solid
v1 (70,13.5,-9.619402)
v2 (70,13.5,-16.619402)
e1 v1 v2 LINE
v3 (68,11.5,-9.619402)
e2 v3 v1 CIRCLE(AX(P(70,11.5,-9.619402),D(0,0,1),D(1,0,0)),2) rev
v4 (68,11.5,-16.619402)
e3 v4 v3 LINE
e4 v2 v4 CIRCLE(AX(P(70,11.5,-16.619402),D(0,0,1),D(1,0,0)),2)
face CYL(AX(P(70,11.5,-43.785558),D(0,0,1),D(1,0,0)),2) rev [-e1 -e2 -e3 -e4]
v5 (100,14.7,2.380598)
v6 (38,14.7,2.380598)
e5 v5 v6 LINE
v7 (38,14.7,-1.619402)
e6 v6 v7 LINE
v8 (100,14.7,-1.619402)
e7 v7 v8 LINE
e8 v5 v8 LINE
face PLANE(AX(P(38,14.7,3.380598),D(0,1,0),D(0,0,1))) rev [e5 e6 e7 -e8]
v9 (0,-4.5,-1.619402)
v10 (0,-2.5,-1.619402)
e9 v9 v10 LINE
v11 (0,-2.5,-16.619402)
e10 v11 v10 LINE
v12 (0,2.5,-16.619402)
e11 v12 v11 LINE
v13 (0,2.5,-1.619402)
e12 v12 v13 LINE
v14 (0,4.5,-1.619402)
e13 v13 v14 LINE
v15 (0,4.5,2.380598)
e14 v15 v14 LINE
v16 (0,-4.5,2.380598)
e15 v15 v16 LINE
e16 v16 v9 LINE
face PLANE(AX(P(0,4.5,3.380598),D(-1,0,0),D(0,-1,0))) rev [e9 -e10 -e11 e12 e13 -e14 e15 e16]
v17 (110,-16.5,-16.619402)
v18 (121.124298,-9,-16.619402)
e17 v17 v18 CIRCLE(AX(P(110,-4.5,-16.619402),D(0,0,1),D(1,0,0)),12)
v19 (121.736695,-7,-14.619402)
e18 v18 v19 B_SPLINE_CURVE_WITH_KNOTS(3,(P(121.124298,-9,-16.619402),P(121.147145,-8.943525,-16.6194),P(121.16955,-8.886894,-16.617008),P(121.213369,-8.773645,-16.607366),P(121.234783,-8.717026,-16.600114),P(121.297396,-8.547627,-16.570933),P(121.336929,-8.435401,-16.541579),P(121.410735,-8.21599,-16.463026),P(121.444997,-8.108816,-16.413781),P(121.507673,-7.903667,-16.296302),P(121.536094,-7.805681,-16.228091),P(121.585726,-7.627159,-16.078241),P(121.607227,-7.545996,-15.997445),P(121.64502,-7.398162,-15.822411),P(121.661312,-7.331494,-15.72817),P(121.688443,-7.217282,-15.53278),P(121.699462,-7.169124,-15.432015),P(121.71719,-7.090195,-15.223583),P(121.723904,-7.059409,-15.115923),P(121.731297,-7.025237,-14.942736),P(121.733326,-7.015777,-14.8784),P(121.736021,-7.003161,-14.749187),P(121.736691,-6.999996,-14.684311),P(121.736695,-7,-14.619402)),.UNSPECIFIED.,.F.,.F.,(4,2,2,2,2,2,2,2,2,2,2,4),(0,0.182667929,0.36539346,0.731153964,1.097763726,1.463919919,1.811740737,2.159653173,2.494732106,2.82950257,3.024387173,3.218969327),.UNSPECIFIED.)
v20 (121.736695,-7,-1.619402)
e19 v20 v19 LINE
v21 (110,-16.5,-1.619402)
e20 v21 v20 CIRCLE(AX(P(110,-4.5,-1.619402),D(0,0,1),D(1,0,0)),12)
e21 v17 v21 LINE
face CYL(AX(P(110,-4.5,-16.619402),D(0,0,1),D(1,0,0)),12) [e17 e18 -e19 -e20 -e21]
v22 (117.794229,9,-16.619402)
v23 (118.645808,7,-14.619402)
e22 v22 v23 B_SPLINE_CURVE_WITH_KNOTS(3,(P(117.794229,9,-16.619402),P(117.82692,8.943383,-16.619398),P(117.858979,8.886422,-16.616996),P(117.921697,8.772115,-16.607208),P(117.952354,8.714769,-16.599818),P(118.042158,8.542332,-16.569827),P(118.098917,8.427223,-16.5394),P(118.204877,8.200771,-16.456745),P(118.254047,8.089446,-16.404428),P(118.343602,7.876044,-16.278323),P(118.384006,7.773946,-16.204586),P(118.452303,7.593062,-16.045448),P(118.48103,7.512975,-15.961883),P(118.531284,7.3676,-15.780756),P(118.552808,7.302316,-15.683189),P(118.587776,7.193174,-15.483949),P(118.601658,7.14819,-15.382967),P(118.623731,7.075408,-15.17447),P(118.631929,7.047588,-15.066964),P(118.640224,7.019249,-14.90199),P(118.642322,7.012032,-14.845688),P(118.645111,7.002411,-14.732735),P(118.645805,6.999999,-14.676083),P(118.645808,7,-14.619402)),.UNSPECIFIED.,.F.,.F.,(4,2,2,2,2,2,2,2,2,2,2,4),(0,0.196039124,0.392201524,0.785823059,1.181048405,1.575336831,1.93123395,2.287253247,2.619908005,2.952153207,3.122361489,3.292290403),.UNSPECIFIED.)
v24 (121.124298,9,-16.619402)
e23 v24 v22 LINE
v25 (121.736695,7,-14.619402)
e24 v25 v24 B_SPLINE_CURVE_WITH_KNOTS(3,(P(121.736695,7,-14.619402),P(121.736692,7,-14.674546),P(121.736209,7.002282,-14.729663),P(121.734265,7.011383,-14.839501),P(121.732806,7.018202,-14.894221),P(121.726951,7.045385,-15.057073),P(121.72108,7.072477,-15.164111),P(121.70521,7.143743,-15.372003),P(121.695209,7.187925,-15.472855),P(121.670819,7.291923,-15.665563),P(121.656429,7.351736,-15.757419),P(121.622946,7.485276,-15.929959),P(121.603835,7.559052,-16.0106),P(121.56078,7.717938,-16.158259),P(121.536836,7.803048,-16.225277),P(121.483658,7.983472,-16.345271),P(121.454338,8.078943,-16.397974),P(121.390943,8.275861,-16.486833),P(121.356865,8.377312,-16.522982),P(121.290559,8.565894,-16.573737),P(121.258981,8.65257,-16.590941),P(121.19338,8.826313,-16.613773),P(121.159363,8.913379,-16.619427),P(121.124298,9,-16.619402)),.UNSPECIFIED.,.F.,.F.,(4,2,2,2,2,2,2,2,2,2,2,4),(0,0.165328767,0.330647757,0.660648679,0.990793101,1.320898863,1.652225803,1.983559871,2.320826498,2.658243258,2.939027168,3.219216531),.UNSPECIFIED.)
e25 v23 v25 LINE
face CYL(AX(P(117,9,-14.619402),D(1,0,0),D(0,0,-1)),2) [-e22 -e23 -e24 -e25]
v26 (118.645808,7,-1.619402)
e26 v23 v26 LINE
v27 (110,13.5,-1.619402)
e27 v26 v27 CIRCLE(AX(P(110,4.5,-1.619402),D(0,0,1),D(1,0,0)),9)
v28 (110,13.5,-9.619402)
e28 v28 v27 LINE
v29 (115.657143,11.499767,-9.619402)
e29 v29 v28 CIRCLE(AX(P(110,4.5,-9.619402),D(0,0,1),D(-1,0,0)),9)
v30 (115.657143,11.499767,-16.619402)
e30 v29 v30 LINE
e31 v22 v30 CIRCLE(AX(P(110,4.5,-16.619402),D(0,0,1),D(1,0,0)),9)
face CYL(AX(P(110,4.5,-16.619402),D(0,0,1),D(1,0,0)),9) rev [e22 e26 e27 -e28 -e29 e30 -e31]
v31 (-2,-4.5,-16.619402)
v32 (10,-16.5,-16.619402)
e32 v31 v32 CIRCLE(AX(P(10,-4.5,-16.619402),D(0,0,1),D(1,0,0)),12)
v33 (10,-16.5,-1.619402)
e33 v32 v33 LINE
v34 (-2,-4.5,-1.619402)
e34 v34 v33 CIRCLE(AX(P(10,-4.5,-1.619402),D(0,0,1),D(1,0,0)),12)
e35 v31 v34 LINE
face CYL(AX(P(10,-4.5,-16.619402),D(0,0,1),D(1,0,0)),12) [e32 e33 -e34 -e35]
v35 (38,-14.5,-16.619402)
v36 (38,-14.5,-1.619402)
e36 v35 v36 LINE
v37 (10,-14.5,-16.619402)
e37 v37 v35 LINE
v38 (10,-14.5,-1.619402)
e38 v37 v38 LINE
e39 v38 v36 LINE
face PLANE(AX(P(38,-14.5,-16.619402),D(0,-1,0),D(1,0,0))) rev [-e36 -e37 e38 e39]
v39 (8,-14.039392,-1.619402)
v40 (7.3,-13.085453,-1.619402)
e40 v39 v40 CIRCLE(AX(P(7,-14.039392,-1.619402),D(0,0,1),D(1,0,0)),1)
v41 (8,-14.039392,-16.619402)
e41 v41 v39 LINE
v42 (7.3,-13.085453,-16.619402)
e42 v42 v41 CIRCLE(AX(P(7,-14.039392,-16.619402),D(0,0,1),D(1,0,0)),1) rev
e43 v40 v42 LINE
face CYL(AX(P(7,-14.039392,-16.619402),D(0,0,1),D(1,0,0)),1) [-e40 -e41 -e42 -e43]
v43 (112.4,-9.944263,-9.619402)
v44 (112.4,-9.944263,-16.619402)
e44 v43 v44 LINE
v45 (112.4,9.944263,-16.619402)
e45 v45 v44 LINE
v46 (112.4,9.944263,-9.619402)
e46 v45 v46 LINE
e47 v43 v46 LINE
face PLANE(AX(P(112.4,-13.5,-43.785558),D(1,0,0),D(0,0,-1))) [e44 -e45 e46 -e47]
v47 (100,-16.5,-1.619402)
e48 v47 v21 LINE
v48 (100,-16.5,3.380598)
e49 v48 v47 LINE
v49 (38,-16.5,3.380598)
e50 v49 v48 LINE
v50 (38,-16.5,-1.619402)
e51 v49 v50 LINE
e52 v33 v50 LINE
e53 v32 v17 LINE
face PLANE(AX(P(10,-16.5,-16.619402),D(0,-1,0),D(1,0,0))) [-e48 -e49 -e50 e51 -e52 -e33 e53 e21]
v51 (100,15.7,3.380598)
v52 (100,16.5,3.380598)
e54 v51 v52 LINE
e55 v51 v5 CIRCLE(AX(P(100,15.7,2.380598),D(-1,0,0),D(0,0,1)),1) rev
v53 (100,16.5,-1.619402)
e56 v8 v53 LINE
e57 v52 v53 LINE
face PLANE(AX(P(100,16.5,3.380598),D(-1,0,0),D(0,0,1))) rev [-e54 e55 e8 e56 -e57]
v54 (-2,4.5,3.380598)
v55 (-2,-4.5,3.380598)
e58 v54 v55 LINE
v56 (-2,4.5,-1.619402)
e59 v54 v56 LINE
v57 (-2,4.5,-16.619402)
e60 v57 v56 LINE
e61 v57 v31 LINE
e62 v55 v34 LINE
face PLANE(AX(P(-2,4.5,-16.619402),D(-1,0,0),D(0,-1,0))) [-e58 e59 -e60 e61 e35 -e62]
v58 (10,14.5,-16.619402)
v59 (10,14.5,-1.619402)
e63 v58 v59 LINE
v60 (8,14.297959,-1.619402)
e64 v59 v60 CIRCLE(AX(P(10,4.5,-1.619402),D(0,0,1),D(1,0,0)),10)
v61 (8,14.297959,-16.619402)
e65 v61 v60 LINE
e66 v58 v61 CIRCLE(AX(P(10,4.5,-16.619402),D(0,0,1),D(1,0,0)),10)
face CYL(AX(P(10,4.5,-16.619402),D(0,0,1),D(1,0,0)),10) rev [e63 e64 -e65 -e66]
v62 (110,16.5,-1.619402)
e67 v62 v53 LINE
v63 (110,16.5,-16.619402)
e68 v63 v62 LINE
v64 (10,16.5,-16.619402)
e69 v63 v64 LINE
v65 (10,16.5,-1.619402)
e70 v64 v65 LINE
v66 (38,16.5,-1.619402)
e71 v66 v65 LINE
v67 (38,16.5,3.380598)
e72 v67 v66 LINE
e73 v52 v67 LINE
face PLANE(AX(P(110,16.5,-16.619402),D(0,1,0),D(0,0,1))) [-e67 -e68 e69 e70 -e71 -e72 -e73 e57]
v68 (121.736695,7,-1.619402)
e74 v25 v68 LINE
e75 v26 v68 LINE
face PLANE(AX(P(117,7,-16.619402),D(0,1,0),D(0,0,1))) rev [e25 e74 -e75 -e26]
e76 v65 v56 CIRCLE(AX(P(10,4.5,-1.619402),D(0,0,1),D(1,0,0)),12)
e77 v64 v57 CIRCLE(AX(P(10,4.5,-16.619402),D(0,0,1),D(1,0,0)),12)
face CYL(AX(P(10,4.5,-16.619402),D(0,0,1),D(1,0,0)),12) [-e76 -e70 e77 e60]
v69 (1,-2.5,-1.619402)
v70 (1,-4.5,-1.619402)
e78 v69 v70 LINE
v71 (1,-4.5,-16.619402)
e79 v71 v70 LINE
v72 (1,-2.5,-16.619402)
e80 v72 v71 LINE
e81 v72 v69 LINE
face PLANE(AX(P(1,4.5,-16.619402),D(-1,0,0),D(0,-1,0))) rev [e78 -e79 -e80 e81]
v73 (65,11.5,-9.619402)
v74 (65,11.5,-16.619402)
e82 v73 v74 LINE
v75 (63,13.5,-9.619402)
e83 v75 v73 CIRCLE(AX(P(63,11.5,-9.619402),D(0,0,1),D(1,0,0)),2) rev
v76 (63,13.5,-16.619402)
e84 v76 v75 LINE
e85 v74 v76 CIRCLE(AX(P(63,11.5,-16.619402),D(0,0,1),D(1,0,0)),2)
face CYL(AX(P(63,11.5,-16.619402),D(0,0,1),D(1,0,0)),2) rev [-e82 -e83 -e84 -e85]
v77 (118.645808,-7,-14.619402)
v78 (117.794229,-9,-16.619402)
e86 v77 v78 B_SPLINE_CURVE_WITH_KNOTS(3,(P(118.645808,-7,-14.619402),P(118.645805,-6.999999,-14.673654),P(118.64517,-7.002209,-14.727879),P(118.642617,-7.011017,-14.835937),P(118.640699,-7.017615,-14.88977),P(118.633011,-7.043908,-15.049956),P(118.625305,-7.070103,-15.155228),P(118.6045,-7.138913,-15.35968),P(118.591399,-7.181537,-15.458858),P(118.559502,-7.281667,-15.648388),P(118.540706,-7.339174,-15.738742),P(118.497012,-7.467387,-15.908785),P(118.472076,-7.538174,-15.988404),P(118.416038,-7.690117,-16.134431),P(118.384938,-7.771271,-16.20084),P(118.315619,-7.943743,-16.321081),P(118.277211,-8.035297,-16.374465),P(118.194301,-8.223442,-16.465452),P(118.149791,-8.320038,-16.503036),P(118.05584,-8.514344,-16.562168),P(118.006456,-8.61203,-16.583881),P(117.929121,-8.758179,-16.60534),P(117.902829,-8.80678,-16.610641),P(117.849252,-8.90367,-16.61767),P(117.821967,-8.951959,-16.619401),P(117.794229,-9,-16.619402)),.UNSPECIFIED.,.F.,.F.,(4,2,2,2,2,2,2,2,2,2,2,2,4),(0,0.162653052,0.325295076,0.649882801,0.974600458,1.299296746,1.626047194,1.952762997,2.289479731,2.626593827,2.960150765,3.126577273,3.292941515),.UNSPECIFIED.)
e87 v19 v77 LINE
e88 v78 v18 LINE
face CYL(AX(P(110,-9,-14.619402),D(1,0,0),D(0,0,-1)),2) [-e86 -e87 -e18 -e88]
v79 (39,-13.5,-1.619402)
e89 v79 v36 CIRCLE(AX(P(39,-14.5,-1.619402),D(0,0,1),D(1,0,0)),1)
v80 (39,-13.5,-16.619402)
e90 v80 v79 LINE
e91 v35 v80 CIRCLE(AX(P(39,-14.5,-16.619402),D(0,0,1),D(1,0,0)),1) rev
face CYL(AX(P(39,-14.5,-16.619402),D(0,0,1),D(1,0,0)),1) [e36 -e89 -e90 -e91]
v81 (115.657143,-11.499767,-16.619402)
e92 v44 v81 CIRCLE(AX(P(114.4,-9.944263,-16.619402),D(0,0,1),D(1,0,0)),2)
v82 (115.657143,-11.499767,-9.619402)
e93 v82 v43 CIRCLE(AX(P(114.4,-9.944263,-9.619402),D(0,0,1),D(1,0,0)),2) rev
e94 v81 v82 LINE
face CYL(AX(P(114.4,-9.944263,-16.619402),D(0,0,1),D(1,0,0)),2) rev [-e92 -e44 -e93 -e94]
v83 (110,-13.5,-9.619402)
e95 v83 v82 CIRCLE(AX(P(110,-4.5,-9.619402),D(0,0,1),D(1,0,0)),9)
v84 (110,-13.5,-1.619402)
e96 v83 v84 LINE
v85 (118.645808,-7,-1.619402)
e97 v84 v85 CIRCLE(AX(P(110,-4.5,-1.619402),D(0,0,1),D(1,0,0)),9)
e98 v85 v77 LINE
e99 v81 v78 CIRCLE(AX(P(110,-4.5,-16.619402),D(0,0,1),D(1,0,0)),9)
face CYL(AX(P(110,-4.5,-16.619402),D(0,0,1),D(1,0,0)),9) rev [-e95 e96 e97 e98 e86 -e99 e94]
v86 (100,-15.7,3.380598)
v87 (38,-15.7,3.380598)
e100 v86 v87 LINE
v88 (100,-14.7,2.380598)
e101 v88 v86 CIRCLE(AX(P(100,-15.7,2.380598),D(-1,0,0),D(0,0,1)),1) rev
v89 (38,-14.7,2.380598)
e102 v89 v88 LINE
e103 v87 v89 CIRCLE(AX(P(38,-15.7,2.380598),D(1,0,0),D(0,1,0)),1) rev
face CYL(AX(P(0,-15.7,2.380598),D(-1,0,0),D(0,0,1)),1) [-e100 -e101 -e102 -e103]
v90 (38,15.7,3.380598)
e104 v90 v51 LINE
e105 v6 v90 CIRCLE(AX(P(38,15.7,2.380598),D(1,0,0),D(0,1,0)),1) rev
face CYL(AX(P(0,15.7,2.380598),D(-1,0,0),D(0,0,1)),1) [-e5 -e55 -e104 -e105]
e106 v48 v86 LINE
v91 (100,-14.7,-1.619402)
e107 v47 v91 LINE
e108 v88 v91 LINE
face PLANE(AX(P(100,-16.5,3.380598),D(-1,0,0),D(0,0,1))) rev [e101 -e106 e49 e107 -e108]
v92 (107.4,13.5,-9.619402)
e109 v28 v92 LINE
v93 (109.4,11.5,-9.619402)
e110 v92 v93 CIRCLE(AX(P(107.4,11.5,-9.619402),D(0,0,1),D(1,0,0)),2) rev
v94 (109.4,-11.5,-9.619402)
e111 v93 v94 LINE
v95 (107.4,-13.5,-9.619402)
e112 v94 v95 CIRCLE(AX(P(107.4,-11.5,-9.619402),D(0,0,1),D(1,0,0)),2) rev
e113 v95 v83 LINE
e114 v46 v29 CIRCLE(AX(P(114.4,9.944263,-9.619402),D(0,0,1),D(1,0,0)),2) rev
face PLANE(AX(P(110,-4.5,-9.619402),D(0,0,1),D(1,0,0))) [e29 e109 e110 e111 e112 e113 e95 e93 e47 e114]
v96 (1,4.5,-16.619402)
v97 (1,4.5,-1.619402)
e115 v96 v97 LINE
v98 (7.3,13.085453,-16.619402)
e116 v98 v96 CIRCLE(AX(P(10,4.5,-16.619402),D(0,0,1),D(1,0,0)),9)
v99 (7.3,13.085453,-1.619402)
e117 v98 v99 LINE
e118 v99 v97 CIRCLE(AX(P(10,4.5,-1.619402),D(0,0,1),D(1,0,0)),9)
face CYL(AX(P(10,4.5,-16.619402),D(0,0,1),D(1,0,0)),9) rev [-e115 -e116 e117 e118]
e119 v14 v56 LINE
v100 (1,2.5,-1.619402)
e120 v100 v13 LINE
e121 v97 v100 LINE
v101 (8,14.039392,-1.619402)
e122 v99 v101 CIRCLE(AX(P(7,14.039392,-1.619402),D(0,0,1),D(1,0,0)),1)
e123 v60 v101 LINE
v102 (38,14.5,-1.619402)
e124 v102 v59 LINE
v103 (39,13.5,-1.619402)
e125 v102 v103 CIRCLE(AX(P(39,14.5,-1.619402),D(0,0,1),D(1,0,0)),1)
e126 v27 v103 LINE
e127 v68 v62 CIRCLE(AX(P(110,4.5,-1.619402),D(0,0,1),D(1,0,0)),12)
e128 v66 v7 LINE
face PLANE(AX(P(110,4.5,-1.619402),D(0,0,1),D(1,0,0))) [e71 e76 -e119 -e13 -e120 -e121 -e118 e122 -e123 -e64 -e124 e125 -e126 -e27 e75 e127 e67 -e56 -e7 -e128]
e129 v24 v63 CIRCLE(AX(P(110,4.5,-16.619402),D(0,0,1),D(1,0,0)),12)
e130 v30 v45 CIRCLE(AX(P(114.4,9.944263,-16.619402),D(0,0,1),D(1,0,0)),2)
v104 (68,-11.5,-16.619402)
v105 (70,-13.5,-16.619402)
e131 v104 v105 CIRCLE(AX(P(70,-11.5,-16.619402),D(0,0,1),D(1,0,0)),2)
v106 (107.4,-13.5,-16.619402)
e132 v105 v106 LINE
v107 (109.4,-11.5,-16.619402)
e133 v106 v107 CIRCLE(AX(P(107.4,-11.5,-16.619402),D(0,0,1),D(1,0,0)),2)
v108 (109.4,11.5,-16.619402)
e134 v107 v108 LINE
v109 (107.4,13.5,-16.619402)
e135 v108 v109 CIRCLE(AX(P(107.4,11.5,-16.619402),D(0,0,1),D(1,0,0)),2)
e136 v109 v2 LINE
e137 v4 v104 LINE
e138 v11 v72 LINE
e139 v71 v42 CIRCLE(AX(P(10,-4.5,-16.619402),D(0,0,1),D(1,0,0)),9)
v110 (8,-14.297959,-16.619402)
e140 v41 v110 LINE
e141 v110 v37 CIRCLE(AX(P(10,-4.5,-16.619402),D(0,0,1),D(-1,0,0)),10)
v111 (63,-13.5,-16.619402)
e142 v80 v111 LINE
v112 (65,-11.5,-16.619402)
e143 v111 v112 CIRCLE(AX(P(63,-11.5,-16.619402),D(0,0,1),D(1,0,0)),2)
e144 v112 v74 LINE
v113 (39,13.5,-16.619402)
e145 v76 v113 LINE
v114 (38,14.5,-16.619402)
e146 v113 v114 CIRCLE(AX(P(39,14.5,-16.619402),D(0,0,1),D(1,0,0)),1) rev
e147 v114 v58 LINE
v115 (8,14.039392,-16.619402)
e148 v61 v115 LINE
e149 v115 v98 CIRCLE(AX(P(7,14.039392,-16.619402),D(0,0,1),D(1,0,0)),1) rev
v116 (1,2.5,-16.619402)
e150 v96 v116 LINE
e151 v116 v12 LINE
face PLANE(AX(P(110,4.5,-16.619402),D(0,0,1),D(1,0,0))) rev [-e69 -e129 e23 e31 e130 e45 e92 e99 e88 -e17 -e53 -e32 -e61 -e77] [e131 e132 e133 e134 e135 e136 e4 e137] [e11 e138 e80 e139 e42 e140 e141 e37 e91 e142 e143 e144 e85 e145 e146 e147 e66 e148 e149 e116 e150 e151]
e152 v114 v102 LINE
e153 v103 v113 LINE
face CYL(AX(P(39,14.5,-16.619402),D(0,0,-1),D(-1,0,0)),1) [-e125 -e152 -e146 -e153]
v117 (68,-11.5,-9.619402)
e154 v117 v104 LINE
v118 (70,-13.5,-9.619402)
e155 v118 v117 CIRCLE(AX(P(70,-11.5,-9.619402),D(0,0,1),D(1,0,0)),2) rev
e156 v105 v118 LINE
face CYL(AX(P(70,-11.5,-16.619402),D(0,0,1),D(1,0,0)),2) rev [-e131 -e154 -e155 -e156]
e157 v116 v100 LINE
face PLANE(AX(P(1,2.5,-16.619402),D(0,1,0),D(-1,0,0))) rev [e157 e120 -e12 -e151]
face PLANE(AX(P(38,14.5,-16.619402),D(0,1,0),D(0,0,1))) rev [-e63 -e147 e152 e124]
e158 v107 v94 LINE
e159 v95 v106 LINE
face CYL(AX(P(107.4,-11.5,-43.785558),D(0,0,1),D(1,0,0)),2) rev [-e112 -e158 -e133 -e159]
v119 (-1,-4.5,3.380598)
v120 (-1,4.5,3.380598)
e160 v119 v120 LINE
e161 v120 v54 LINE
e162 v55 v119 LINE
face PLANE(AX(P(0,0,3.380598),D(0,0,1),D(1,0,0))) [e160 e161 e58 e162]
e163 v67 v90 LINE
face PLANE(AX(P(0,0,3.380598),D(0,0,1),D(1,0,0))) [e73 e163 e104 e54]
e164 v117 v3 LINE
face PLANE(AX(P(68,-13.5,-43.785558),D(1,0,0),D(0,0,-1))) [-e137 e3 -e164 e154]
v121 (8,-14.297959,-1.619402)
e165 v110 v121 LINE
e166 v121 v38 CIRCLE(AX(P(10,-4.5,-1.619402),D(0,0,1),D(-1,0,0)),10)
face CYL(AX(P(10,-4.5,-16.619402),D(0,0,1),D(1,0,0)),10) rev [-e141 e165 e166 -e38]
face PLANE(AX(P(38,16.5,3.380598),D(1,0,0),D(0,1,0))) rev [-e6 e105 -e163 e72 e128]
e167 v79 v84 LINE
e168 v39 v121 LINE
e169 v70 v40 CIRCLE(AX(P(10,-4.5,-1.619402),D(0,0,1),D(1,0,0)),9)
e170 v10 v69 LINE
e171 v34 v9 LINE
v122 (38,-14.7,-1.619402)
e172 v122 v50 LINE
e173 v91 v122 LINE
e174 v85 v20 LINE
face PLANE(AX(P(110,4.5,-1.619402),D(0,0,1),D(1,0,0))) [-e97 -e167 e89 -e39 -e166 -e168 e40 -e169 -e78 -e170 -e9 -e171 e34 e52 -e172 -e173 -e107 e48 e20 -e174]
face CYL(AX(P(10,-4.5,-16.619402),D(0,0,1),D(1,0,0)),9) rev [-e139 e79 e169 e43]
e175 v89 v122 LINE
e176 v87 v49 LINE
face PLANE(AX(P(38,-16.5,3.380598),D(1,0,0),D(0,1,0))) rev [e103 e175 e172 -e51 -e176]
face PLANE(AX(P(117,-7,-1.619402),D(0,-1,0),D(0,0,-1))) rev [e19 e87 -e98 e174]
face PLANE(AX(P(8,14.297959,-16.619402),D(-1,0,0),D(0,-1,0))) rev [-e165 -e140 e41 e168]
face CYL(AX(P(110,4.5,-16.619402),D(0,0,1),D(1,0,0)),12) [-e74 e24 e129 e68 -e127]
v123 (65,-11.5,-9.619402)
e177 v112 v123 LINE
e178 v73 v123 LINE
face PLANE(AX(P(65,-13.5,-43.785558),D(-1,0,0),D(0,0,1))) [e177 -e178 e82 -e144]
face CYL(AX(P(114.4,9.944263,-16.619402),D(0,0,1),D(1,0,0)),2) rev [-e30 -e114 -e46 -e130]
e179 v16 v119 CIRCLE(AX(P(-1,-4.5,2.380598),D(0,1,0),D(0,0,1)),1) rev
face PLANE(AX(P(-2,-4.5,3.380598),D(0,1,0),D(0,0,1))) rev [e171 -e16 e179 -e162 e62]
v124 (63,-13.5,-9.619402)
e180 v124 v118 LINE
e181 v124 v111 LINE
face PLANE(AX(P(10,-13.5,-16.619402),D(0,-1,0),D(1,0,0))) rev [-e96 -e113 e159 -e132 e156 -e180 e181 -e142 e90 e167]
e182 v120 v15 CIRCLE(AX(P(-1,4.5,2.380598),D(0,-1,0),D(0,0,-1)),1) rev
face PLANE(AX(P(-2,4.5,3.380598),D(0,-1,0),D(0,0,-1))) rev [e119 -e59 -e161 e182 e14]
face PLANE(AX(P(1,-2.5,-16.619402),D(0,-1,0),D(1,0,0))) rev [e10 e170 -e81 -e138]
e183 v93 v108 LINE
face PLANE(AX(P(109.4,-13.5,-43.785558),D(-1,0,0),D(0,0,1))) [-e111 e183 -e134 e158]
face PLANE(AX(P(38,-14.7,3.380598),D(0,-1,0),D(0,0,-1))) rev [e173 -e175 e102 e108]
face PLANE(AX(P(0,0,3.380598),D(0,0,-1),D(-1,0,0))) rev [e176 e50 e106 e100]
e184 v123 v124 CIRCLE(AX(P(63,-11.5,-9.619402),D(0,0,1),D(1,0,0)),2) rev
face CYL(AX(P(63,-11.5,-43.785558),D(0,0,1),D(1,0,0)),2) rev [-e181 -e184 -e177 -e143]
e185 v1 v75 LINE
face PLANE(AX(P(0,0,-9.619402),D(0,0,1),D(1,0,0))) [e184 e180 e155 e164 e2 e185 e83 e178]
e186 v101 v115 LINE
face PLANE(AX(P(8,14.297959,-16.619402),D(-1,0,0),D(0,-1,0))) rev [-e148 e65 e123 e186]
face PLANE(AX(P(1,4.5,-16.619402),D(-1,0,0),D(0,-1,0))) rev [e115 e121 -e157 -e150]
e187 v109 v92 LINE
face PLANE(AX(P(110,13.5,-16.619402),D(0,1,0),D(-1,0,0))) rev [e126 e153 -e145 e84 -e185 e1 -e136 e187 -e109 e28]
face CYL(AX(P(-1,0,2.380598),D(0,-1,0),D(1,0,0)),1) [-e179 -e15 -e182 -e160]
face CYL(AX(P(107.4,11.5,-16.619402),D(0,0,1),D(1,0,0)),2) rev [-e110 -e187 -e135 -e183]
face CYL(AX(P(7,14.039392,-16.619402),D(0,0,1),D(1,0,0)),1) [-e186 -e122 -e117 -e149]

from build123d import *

# Parameters (mm, degrees)
BOSS_EXTRUDE2_DEPTH                    = 15
SKETCH4_W                              = 3
SKETCH4_H                              = 27
BOSS_EXTRUDE4_CROSS_STRUCTURES_DEPTH   = 15
SKETCH6_W                              = 3
SKETCH6_H                              = 27
CUT_EXTRUDE3_8_MM_SPACING_DEPTH        = 8
CUT_EXTRUDE4_ELECTRONICS_SPACING_DEPTH = 125.021167548
SKETCH8_W                              = 15
SKETCH8_H                              = 14
CUT_EXTRUDE2_USB_C_CUTOUT_DEPTH        = 5
FILLET2_USBC_R                         = 2
FILLET3_INNER_CORNERS_FRONT_R          = 1
FILLET5_INNER_CORNERS_R                = 2
SKETCH18_W                             = 62
SKETCH18_H                             = 1.8
SKETCH18_W_2                           = 2
SKETCH18_H_2                           = 9
BOSS_EXTRUDE7_DEPTH                    = 5
FILLET1_R                              = 1
SKETCH19_W                             = 1
SKETCH19_H                             = 5
CUT_EXTRUDE1_DEPTH                     = 124.762162398


with BuildPart() as part:
    # Sketch3 → Boss-Extrude2 (new body)
    with BuildSketch(Plane.XY.offset(-1.6194024)):
        with BuildLine():
            Line((110, 16.5), (10, 16.5))
            ThreePointArc((10, 16.5), (1.514718626, 12.985281374), (-2, 4.5))
            Line((-2, 4.5), (-2, -4.5))
            ThreePointArc((-2, -4.5), (1.514718626, -12.985281374), (10, -16.5))
            Line((10, -16.5), (110, -16.5))
            ThreePointArc((110, -16.5), (118.485281374, -12.985281374), (122, -4.5))
            Line((122, -4.5), (122, 4.5))
            ThreePointArc((122, 4.5), (118.485281374, 12.985281374), (110, 16.5))
        make_face()
        with BuildLine():
            Line((119, -4.5), (119, 4.5))
            ThreePointArc((119, 4.5), (116.363961031, 10.863961031), (110, 13.5))
            Line((110, 13.5), (10, 13.5))
            ThreePointArc((10, 13.5), (3.636038969, 10.863961031), (1, 4.5))
            Line((1, 4.5), (1, -4.5))
            ThreePointArc((1, -4.5), (3.636038969, -10.863961031), (10, -13.5))
            Line((10, -13.5), (110, -13.5))
            ThreePointArc((110, -13.5), (116.363961031, -10.863961031), (119, -4.5))
        make_face(mode=Mode.SUBTRACT)
    extrude(amount=-BOSS_EXTRUDE2_DEPTH)

    # Sketch4 → Boss-Extrude4 - cross structures (add)
    with BuildSketch(Plane.XY.offset(-1.6194024)):
        with Locations((110.9, 0)):
            Rectangle(SKETCH4_W, SKETCH4_H)
        with Locations((66.5, 0)):
            Rectangle(SKETCH4_W, SKETCH4_H)
    extrude(amount=-BOSS_EXTRUDE4_CROSS_STRUCTURES_DEPTH)

    # Sketch6 → Cut-Extrude3 - 8 mm spacing (cut)
    with BuildSketch(Plane.XY.offset(-1.6194024)):
        with BuildLine():
            Line((109.4, 13.5), (110, 13.5))
            ThreePointArc((110, 13.5), (111.211013131, 13.418152678), (112.4, 13.174099377))
            Line((112.4, 13.174099377), (112.4, -13.174099377))
            ThreePointArc((112.4, -13.174099377), (111.211013131, -13.418152678), (110, -13.5))
            Line((110, -13.5), (109.4, -13.5))
            Line((109.4, -13.5), (109.4, 13.5))
        make_face()
        with Locations((66.5, 0)):
            Rectangle(SKETCH6_W, SKETCH6_H)
    extrude(amount=-CUT_EXTRUDE3_8_MM_SPACING_DEPTH, mode=Mode.SUBTRACT)

    # Sketch7 → Cut-Extrude4 - electronics spacing (cut, through all)
    with BuildSketch(Plane.XY.offset(-1.6194024)):
        with BuildLine():
            Line((38, -14.5), (10, -14.5))
            ThreePointArc((10, -14.5), (8.99491038, -14.44936153), (8, -14.297958971))
            Line((8, -14.297958971), (8, 14.297958971))
            ThreePointArc((8, 14.297958971), (8.99491038, 14.44936153), (10, 14.5))
            Line((10, 14.5), (38, 14.5))
            Line((38, 14.5), (38, -14.5))
        make_face()
    extrude(amount=-CUT_EXTRUDE4_ELECTRONICS_SPACING_DEPTH, mode=Mode.SUBTRACT)

    # Sketch8 → Cut-Extrude2 - USB-C cutout (cut)
    with BuildSketch(Plane(origin=(122, 0, 0), x_dir=(0, 0, -1), z_dir=(1, 0, 0))):
        with Locations((9.1194024, 0)):
            Rectangle(SKETCH8_W, SKETCH8_H)
    extrude(amount=-CUT_EXTRUDE2_USB_C_CUTOUT_DEPTH, mode=Mode.SUBTRACT)

    # Fillet2 - USBC
    fillet2_usbc_edges = [part.edges().sort_by_distance(p)[0] for p in [
        (120.191251414, 7, -16.6194024),
        (120.191251414, -7, -16.6194024),
    ]]
    fillet(fillet2_usbc_edges, radius=FILLET2_USBC_R)

    # Fillet3 - inner corners, front
    fillet3_inner_corners_front_edges = [part.edges().sort_by_distance(p)[0] for p in [
        (38, 13.5, -9.1194024),
        (38, -13.5, -9.1194024),
        (8, -13.274964387, -9.1194024),
        (8, 13.274964387, -9.1194024),
    ]]
    fillet(fillet3_inner_corners_front_edges, radius=FILLET3_INNER_CORNERS_FRONT_R - 0.0001)  # a hair under: the kernel refuses the full size

    # Fillet5 - inner corners
    fillet5_inner_corners_edges = [part.edges().sort_by_distance(p)[0] for p in [
        (112.4, -13.174099377, -13.1194024),
        (109.4, -13.5, -13.1194024),
        (109.4, 13.5, -13.1194024),
        (65, -13.5, -13.1194024),
        (65, 13.5, -13.1194024),
        (68, 13.5, -13.1194024),
        (68, -13.5, -13.1194024),
        (112.4, 13.174099377, -13.1194024),
    ]]
    fillet(fillet5_inner_corners_edges, radius=FILLET5_INNER_CORNERS_R)

    # Sketch18 → Boss-Extrude7 (add)
    with BuildSketch(Plane.XY.offset(-1.6194024)):
        with Locations((69, 15.6)):
            Rectangle(SKETCH18_W, SKETCH18_H)
        with Locations((69, -15.6)):
            Rectangle(SKETCH18_W, SKETCH18_H)
        with Locations((-1, 0)):
            Rectangle(SKETCH18_W_2, SKETCH18_H_2)
    extrude(amount=BOSS_EXTRUDE7_DEPTH)

    # Fillet1
    fillet1_edges = [part.edges().sort_by_distance(p)[0] for p in [
        (69, 14.7, 3.3805976),
        (69, -14.7, 3.3805976),
        (0, 0, 3.3805976),
    ]]
    fillet(fillet1_edges, radius=FILLET1_R)

    # Sketch19 → Cut-Extrude1 (cut, through all)
    with BuildSketch(Plane.XY.offset(-1.6194024)):
        with Locations((0.5, 0)):
            Rectangle(SKETCH19_W, SKETCH19_H)
    extrude(amount=-CUT_EXTRUDE1_DEPTH, mode=Mode.SUBTRACT)


solid = part.part
